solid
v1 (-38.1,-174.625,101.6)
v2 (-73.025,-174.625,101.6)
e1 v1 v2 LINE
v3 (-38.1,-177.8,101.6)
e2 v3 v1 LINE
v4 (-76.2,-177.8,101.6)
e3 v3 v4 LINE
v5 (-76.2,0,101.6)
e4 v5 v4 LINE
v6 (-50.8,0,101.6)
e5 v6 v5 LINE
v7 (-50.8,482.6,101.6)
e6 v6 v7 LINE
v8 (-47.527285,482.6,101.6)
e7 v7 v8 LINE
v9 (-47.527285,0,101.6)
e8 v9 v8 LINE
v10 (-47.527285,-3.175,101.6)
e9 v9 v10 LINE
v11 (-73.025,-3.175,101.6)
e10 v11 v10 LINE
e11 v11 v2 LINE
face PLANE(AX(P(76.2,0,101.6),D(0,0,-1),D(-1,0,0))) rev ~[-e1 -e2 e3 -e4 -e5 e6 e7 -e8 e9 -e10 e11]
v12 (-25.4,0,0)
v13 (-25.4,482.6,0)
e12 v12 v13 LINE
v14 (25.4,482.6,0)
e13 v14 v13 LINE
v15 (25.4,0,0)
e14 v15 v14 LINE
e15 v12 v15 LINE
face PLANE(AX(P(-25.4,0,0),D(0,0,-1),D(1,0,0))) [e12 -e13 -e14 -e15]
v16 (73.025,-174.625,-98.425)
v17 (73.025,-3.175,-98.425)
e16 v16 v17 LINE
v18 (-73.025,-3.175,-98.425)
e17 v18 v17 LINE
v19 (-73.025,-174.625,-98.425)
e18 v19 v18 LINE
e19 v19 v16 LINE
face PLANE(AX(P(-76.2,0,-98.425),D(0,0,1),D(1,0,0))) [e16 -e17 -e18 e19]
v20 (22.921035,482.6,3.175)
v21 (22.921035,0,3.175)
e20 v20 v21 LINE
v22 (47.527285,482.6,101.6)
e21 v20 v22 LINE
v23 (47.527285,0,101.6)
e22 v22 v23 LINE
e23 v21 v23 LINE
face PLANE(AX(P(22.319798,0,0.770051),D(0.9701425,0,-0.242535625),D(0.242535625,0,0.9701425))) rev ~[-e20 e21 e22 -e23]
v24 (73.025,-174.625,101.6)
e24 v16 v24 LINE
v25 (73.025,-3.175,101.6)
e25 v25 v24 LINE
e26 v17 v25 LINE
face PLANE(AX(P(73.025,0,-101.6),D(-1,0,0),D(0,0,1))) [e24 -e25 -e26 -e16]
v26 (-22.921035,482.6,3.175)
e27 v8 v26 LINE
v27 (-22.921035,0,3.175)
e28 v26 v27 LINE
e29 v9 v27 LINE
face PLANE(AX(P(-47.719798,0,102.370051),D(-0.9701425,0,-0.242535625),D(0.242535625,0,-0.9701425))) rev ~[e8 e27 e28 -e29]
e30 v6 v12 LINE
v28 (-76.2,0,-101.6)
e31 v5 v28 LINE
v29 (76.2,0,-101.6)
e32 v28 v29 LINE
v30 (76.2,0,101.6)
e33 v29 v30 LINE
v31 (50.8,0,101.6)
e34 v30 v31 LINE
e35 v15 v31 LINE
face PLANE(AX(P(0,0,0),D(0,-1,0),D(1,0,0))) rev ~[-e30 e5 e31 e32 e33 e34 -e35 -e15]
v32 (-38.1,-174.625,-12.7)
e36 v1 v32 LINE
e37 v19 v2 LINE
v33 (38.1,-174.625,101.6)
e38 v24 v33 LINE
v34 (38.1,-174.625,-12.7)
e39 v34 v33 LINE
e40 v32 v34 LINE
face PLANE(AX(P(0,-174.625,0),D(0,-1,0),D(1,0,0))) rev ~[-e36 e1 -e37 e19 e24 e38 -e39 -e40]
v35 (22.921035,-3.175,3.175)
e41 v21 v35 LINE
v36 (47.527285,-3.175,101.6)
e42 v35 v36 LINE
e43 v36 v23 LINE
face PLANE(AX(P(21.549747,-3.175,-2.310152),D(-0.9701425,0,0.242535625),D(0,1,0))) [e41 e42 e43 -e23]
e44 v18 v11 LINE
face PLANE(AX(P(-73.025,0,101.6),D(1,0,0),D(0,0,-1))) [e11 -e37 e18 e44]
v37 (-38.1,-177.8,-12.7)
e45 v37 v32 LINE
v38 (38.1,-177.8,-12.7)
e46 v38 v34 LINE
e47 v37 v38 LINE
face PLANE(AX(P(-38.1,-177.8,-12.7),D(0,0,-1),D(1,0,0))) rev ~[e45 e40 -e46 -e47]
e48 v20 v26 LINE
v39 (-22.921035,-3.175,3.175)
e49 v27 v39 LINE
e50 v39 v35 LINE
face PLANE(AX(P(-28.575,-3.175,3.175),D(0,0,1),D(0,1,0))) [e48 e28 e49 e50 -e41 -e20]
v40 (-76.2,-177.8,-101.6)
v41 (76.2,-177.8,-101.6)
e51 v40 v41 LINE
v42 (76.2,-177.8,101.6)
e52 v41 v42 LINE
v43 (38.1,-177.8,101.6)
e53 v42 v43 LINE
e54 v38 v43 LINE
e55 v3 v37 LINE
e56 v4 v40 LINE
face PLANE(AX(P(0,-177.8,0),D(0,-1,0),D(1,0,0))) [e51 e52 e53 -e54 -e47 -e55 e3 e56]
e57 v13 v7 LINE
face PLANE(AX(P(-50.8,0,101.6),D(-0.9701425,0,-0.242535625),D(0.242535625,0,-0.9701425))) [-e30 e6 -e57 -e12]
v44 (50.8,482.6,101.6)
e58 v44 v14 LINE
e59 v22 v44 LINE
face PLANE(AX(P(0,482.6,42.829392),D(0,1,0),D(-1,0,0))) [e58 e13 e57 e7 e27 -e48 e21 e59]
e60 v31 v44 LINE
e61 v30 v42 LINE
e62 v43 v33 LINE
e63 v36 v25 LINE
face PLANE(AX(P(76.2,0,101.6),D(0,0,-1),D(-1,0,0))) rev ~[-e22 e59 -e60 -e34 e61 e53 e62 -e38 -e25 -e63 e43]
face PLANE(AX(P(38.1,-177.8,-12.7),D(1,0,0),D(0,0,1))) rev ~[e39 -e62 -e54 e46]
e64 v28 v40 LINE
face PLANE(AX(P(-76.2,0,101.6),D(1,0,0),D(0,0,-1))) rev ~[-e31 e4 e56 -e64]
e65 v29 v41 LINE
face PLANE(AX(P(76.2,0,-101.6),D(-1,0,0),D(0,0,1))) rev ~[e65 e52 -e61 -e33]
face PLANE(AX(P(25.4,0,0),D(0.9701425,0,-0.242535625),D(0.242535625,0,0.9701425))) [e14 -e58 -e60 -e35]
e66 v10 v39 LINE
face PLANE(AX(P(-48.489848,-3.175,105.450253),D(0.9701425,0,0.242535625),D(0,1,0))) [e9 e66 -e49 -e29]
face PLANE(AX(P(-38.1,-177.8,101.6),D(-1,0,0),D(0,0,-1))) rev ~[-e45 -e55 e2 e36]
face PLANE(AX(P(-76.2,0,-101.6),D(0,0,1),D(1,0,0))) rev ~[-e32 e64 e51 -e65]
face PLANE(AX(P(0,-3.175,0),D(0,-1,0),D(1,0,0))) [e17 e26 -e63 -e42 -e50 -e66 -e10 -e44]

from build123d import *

# Parameters (mm, degrees)
F1_DEPTH    = 508
F3_DEPTH    = 177.8
F4_T        = 3.175
F4_T3_DEPTH = 111.0768828907
F4_T5_DEPTH = 57.15
F4_T7_DEPTH = 111.0768828907
F6_DEPTH    = 25.4
F8_DEPTH    = 25.4


# Not quite as in the source:
# - a shell that OpenCascade refuses in one call is made with other operations: the cavity is built on its own and cut out


with BuildPart() as f1:
    # F0 (on Front) → F1 (new body)
    with BuildSketch(Plane.XZ):
        Polygon((-25.4, 0), (0, 0), (25.4, 0), (50.8, 101.6), (-50.8, 101.6), align=None)
    extrude(amount=-F1_DEPTH)

    # F2 (on Front) → F3 (join)
    with BuildSketch(Plane.XZ):
        Polygon((76.2, -101.6), (76.2, 0), (76.2, 101.6), (-76.2, 101.6), (-76.2, 0), (-76.2, -101.6), align=None)
    extrude(amount=F3_DEPTH)

    # F4: shell of thickness 3.175, made by hand


with BuildPart() as f4_core1:
    # F4_t2: copy of F1
    add(f1.part)

    # the walls: a layer under each face that stays
    f4_faces = [f4_core1.faces().sort_by_distance(p)[0] for p in [
        (76.2, -88.9, 0),
        (0, -88.9, -101.6),
        (0, -177.8, 0),
        (-50.8, 0, -67.7333333333),
        (-76.2, -88.9, 0),
        (-38.1, 254, 50.8),
        (0, 254, 0),
        (38.1, 254, 50.8),
        (0, 508, 50.8),
    ]]
    thicken(f4_faces, amount=-F4_T, mode=Mode.SUBTRACT)

    # F4_s4 → F4_t3 (cut)
    with BuildSketch(Plane(origin=(-27.6641682565, 0, 110.6566730262), x_dir=(0, 1, 0), z_dir=(0.242535625, 0, -0.9701425001))):
        Polygon((0.03175, -24.6733695037), (-3.175, -24.6416195037), (-3.175, -21.4666195037), (0, -21.4666195037), align=None)
    extrude(amount=F4_T3_DEPTH, mode=Mode.SUBTRACT)

    # F4_s6 → F4_t5 (cut)
    with BuildSketch(Plane.YZ.offset(-28.575)):
        Polygon((0.03175, -0.03175), (-3.175, 0), (-3.175, 3.175), (0, 3.175), align=None)
    extrude(amount=F4_T5_DEPTH, mode=Mode.SUBTRACT)

    # F4_s8 → F4_t7 (cut)
    with BuildSketch(Plane(origin=(0.7240670376, 0, 2.8962681503), x_dir=(0, 1, 0), z_dir=(0.242535625, 0, 0.9701425001))):
        Polygon((0.03175, -24.6733695037), (-3.175, -24.6416195037), (-3.175, -21.4666195037), (0, -21.4666195037), align=None)
    extrude(amount=F4_T7_DEPTH, mode=Mode.SUBTRACT)


with BuildPart() as f1_1:
    add(f1.part)

    # what is left inside the walls is the cavity
    f4_cavity = [f4_core1.part.solids().sort_by_distance(p)[0] for p in [
        (0, 51.858333, 101.56825),
    ]]
    add(f4_cavity, mode=Mode.SUBTRACT)

    # F5 (on face) → F6 (cut)
    with BuildSketch(Plane(origin=(0, 508, 0), x_dir=(-1, 0, 0), z_dir=(0, 1, 0))):
        Polygon((-47.5272849097, 101.6), (-50.8, 101.6), (-50.00625, 98.425), (-25.4, 0), (25.4, 0), (50.00625, 98.425), (50.8, 101.6), (47.5272849097, 101.6), (46.7335349097, 98.425), (22.9210349097, 3.175), (-22.9210349097, 3.175), (-46.7335349097, 98.425), align=None)
        Polygon((47.5272849097, 101.6), (-47.5272849097, 101.6), (-46.7335349097, 98.425), (-22.9210349097, 3.175), (22.9210349097, 3.175), (46.7335349097, 98.425), align=None)
    extrude(amount=-F6_DEPTH, mode=Mode.SUBTRACT)

    # F7 (on face) → F8 (cut)
    with BuildSketch(Plane.XZ.offset(177.8)):
        Polygon((-38.1, -12.7), (0, -12.7), (38.1, -12.7), (38.1, 101.6), (-38.1, 101.6), align=None)
    extrude(amount=-F8_DEPTH, mode=Mode.SUBTRACT)


solid = f1_1.part
